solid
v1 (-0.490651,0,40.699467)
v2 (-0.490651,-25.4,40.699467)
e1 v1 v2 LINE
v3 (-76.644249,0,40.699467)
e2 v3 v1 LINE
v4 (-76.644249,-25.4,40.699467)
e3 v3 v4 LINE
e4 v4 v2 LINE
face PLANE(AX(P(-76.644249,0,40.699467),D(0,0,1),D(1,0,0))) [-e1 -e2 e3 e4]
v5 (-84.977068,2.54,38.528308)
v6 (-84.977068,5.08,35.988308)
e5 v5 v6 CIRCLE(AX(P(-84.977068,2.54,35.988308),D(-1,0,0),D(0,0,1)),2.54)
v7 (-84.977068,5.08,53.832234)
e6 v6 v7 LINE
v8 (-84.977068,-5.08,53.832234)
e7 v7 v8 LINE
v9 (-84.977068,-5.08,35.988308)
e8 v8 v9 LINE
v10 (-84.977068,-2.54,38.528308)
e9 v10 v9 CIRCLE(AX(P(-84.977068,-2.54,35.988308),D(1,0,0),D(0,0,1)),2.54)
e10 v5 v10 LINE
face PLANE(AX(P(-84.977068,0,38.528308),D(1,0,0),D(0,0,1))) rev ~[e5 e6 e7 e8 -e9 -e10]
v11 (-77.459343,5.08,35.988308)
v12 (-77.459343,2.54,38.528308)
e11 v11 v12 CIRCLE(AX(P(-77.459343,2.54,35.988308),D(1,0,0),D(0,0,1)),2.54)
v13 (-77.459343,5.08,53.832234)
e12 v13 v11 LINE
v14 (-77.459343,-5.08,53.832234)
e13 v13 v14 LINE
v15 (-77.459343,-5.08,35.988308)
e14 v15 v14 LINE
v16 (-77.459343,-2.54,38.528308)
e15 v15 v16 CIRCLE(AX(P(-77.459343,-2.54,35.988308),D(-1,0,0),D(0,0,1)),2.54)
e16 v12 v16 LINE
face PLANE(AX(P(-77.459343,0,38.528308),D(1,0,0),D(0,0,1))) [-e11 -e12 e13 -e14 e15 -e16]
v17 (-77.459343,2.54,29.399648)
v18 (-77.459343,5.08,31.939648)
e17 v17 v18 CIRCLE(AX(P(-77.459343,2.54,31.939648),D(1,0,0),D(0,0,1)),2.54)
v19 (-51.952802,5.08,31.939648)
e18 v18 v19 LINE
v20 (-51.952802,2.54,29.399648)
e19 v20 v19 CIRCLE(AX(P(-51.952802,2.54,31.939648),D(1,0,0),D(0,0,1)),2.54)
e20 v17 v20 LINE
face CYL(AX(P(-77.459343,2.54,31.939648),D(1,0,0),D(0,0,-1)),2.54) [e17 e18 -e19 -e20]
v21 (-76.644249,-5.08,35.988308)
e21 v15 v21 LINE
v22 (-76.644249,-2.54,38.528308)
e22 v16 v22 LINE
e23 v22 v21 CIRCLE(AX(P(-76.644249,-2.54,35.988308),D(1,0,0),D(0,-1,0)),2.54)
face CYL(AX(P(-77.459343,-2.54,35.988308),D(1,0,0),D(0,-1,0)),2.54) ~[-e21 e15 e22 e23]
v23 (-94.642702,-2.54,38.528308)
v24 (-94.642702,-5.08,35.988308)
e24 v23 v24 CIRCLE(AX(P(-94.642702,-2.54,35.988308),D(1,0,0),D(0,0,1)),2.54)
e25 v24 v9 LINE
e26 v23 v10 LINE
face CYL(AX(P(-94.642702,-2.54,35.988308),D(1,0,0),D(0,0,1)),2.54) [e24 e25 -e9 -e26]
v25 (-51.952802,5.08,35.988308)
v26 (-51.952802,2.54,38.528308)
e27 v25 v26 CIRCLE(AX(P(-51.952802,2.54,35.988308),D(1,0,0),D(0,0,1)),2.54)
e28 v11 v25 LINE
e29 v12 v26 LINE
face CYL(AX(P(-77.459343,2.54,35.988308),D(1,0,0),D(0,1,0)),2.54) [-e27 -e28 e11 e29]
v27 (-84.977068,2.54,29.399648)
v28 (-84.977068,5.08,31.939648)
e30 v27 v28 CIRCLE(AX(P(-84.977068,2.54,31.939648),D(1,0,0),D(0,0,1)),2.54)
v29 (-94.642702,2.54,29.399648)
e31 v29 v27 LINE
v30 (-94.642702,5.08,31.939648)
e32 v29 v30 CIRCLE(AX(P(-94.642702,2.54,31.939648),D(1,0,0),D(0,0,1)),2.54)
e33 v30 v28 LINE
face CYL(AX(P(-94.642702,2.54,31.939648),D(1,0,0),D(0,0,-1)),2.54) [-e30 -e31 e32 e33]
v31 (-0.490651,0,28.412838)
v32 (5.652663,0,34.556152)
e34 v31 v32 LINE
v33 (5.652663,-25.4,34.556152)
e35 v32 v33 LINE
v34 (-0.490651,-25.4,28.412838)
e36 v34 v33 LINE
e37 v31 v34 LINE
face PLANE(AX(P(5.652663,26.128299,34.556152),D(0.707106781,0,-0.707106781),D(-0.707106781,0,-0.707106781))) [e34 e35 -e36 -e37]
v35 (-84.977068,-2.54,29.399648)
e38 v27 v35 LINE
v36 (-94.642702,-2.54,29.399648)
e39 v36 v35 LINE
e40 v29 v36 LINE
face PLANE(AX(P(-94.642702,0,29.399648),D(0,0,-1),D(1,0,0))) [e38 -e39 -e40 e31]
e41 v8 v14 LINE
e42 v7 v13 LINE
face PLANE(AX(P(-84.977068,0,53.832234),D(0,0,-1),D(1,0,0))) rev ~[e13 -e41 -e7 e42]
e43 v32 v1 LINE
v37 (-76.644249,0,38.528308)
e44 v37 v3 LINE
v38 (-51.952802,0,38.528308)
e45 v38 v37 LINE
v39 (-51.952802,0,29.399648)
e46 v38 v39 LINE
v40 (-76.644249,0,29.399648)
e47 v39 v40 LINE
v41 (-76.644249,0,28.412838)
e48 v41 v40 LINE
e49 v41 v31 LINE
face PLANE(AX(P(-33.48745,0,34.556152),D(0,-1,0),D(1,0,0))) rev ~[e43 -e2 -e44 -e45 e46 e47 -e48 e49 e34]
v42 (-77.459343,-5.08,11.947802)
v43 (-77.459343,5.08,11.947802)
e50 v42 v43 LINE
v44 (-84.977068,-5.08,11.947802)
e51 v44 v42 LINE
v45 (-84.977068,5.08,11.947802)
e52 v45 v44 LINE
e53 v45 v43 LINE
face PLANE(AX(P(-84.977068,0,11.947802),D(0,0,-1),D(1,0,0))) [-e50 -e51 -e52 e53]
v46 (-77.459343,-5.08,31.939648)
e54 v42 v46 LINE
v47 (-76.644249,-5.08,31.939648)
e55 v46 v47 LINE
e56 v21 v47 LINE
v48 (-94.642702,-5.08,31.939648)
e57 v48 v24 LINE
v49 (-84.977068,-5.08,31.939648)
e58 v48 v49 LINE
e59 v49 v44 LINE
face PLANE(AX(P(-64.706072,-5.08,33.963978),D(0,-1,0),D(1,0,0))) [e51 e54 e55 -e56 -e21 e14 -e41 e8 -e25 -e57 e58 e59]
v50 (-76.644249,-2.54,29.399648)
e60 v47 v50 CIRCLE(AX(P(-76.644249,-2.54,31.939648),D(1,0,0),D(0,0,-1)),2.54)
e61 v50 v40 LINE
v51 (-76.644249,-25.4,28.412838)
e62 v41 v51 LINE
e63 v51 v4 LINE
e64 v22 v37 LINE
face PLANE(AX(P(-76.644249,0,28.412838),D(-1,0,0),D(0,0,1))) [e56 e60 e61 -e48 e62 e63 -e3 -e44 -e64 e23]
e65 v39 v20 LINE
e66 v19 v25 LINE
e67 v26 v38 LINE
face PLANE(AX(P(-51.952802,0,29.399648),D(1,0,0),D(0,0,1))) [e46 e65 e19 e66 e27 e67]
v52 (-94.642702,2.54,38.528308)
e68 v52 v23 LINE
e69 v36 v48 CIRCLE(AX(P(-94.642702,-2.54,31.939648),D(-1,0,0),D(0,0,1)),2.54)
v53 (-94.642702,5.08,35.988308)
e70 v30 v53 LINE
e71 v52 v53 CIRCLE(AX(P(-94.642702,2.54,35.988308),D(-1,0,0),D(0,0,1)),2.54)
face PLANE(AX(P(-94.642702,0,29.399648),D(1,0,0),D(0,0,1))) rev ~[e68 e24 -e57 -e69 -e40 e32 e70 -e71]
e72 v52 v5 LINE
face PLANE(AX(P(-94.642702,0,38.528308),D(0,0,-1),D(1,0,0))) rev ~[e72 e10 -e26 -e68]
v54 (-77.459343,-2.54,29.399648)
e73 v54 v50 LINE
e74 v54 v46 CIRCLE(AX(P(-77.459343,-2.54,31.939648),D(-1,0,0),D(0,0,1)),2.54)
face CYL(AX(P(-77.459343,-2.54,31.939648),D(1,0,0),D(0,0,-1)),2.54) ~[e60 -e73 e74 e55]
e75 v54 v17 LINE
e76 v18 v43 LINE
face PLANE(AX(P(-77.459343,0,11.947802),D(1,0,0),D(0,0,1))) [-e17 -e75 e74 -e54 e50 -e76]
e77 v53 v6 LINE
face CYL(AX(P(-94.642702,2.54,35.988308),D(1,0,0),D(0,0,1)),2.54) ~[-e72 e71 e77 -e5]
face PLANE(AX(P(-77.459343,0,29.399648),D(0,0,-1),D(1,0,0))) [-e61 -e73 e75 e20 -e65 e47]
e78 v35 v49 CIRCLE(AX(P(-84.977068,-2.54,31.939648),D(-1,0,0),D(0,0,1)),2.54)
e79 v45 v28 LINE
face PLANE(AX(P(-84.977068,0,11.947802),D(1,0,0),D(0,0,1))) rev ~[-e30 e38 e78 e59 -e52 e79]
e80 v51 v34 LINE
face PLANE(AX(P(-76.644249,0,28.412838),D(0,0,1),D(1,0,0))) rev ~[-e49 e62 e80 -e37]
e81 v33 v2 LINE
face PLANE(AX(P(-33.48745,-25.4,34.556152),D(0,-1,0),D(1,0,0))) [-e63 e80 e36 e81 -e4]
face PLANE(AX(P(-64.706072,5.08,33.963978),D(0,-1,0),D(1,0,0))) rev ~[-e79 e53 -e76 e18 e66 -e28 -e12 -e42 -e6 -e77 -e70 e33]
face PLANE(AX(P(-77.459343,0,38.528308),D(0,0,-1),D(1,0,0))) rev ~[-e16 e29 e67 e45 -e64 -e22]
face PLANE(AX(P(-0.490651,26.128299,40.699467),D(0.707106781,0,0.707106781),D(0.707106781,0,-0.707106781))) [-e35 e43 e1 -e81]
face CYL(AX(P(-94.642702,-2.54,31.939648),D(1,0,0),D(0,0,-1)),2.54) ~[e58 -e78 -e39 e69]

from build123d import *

# Parameters (mm, degrees)
F0_W        = 25.5065411329
F0_H        = 9.1286599636
F0_W_2      = 9.6656344831
F0_W_3      = 7.5177252293
F0_H_2      = 15.3039256111
F0_H_3      = 17.4518460408
F1_DEPTH    = 5.08
F2_R        = 2.54
F3_R        = 2.54
F4_W        = 86.313597858
F4_H        = 12.2866295278
F5_DEPTH    = 25.4
F6_T1_DEPTH = 77.6565983155


# Not quite as in the source:
# - a fillet or chamfer that OpenCascade refuses, or shapes differently, is made with other operations: its cross-section is extruded or revolved along the edge and cut away or added


with BuildPart() as f1:
    # F0 (on Front) → F1 (new body, symmetric)
    with BuildSketch(Plane.XZ):
        with Locations((-64.7060722113, 33.9639782906)):
            Rectangle(F0_W, F0_H)
        with Locations((-89.8098852485, 33.9639782906)):
            Rectangle(F0_W_2, F0_H)
        with Locations((-81.2182053924, 46.1802710779)):
            Rectangle(F0_W_3, F0_H_2)
        with Locations((-81.2182053924, 33.9639782906)):
            Rectangle(F0_W_3, F0_H)
        with Locations((-81.2182053924, 20.6737252884)):
            Rectangle(F0_W_3, F0_H_3)
    extrude(amount=F1_DEPTH, both=True)

    # F2
    f2_edges = [f1.edges().sort_by_distance(p)[0] for p in [
        (-64.706072, -5.08, 38.528308),
        (-89.809885, -5.08, 38.528308),
    ]]
    fillet(f2_edges, radius=F2_R)

    # F3
    f3_edges = [f1.edges().sort_by_distance(p)[0] for p in [
        (-64.706072, -5.08, 29.399648),
        (-89.809885, -5.08, 29.399648),
        (-89.809885, 5.08, 29.399648),
        (-64.706072, 5.08, 29.399648),
        (-64.706072, 5.08, 38.528308),
        (-89.809885, 5.08, 38.528308),
    ]]
    fillet(f3_edges, radius=F3_R)

    # F4 (on Front) → F5 (join)
    with BuildSketch(Plane.XZ):
        with Locations((-33.4874503314, 34.556152299)):
            Rectangle(F4_W, F4_H)
    extrude(amount=F5_DEPTH)

    # F6: chamfer of 10.16 on 2 edges, made by hand

    # F6_s2 → F6_t1 (cut)
    with BuildSketch(Plane.XZ.offset(-26.1282991577)):
        Polygon((-0.4906514025, 40.699467063), (9.6693485975, 30.539467063), (9.6693485975, 40.699467063), align=None)
        Polygon((9.6693485975, 38.5728375351), (-0.4906514025, 28.4128375351), (9.6693485975, 28.4128375351), align=None)
    extrude(amount=F6_T1_DEPTH, mode=Mode.SUBTRACT)


solid = f1.part
